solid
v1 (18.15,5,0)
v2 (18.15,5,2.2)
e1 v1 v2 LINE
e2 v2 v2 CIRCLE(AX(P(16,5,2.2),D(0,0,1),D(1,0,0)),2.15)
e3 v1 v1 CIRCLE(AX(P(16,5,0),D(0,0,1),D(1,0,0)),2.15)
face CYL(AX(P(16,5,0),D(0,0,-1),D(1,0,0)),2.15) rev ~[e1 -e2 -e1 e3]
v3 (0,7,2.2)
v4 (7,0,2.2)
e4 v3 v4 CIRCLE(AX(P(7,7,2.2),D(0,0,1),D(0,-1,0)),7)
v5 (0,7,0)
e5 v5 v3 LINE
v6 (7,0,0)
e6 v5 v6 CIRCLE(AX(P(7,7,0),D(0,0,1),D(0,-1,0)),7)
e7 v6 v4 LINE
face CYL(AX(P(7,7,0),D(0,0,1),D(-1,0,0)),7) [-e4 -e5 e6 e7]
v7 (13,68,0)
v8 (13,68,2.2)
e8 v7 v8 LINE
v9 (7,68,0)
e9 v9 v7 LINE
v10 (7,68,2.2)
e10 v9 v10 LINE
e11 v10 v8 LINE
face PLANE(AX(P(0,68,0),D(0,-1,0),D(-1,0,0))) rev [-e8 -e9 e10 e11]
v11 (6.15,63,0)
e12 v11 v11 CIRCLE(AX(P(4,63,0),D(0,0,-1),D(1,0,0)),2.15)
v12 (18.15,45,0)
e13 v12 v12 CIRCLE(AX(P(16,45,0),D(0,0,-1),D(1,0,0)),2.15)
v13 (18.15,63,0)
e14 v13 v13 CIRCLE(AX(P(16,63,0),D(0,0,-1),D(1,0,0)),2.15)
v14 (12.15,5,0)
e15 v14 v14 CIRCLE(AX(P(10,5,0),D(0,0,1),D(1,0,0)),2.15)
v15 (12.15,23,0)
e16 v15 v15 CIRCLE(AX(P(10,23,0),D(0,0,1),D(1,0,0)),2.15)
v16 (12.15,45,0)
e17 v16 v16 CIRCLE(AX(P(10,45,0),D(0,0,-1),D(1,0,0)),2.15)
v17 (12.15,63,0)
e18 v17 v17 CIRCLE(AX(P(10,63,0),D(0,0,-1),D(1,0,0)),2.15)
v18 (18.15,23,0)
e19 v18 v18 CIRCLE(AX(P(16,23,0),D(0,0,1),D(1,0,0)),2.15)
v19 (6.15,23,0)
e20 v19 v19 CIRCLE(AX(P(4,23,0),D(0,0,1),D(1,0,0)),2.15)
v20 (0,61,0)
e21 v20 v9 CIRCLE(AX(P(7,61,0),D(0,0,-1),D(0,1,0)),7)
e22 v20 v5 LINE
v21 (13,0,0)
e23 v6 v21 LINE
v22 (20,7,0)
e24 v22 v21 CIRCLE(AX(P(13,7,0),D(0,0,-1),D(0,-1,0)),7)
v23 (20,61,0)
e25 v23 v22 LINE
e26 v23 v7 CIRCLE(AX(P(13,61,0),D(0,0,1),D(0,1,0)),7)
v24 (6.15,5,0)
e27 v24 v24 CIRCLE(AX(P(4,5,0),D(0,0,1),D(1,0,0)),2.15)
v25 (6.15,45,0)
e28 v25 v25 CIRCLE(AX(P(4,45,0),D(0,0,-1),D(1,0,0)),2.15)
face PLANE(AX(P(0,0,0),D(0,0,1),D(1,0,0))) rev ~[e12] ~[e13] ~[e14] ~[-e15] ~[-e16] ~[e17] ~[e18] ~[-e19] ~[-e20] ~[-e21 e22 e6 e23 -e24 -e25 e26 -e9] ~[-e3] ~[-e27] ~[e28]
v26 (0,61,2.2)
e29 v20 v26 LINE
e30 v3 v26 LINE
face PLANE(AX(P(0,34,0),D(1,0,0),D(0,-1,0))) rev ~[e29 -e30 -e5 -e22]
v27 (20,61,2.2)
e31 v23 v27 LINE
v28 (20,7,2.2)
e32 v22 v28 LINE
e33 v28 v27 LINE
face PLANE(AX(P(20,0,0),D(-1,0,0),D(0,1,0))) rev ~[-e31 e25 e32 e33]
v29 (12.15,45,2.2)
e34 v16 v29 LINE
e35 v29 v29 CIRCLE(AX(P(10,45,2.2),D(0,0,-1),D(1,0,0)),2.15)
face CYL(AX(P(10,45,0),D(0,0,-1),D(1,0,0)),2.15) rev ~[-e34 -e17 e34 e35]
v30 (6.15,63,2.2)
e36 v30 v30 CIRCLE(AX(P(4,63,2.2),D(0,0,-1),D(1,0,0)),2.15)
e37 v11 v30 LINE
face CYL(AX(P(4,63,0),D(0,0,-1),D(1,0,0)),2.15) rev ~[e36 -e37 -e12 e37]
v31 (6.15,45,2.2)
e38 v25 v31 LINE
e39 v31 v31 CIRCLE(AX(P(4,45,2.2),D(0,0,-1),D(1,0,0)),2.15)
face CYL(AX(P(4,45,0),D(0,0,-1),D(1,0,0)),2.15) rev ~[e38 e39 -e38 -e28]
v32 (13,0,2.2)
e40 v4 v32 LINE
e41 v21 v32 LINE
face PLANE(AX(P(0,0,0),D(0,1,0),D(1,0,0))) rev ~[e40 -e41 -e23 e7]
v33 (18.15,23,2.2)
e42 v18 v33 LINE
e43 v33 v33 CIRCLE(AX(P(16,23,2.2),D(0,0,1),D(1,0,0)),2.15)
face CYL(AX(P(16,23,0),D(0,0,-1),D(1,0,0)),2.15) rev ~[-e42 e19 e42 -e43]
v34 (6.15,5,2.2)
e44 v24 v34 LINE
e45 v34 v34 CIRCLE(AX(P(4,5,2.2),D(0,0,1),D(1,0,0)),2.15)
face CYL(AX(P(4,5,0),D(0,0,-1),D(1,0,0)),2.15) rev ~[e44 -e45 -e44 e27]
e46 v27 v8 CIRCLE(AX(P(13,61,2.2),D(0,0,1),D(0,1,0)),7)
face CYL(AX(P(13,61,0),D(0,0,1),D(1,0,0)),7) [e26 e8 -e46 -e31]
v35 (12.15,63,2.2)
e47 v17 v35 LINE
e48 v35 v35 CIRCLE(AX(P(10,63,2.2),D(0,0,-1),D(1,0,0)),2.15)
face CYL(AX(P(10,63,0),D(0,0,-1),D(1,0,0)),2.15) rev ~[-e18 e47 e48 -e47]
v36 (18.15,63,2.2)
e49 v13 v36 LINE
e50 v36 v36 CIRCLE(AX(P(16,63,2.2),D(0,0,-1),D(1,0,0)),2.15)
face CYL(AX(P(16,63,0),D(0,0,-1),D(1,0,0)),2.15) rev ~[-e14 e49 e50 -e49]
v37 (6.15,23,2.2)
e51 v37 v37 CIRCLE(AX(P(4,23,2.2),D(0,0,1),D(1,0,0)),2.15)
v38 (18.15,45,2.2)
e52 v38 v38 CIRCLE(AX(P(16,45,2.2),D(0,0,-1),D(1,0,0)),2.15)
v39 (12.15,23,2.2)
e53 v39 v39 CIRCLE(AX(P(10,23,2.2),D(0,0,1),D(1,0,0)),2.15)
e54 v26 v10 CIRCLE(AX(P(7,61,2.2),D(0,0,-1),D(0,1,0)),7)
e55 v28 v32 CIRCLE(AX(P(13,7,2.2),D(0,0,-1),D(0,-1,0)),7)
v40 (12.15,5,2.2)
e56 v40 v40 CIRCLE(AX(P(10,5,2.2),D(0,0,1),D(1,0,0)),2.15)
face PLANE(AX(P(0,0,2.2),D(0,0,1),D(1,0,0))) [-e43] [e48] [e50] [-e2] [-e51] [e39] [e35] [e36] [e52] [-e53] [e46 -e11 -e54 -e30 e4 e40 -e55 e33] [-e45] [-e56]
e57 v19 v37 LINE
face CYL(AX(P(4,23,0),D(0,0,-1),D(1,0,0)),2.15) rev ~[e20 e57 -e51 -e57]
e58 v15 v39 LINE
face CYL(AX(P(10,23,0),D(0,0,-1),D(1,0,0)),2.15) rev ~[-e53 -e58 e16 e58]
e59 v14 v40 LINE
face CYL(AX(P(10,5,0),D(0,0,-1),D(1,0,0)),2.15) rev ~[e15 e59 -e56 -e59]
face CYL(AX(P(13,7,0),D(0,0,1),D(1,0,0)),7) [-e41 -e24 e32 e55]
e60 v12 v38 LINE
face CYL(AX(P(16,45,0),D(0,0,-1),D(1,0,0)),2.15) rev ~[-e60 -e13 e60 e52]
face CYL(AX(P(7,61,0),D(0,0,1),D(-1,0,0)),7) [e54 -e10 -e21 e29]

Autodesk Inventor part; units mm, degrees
ref_plane "YZ Plane" through (0, 0, 0) normal (1, 0, 0) x (0, 1, 0)
ref_plane "XZ Plane" through (0, 0, 0) normal (0, 1, 0) x (-1, 0, 0)
ref_plane "XY Plane" through (0, 0, 0) normal (0, 0, 1) x (1, 0, 0)
sketch "Esquisse12" plane through (0, 0, 0) normal (0, 0, 1) x (1, 0, 0)
  line L0 (0, 0) -> (20, 0)
  line L1 (20, 0) -> (20, 34)
  line L2 (20, 34) -> (0, 34)
  line L3 (0, 34) -> (0, 0)
  line L4 (10, 34) -> (10, 0) construction
  circle A0 centre (10, 5) radius 2.15
  line L5 (10, 5) -> (20, 5) construction
  circle A1 centre (16, 5) radius 2.15
  circle A2 centre (4, 5) radius 2.15
  circle A3 centre (10, 5) radius 2.15
  circle A4 centre (10, 23) radius 2.15
  circle A5 centre (16, 23) radius 2.15
  circle A6 centre (4, 23) radius 2.15
  dimension "d133" = 20
  dimension "d134" = 5
  dimension "d135" = 4.3
  dimension "d138" = 6
  dimension "d141" = 6
  dimension "d148" = 18
  dimension "d153" = 11
extrude "Extrusion13" add sketch "Esquisse12" along normal blind 2.2
fillet "Congé8" radius 7 2 edges at (20, 0, 1.1) (0, 0, 1.1)
mirror "Symétrie3" about plane through (20, 34, 0) normal (0, 1, 0)
equation "\"d135\" = Holes"
equation "\"d154\" = Depth"
equation "\"d156\" = Rounding"
equation "\"Depth\" = 2.2"
equation "\"Holes\" = 4.3"
equation "\"Height\" = 0"
equation "\"Rounding\" = 7"
properties part number "SideToSide"
